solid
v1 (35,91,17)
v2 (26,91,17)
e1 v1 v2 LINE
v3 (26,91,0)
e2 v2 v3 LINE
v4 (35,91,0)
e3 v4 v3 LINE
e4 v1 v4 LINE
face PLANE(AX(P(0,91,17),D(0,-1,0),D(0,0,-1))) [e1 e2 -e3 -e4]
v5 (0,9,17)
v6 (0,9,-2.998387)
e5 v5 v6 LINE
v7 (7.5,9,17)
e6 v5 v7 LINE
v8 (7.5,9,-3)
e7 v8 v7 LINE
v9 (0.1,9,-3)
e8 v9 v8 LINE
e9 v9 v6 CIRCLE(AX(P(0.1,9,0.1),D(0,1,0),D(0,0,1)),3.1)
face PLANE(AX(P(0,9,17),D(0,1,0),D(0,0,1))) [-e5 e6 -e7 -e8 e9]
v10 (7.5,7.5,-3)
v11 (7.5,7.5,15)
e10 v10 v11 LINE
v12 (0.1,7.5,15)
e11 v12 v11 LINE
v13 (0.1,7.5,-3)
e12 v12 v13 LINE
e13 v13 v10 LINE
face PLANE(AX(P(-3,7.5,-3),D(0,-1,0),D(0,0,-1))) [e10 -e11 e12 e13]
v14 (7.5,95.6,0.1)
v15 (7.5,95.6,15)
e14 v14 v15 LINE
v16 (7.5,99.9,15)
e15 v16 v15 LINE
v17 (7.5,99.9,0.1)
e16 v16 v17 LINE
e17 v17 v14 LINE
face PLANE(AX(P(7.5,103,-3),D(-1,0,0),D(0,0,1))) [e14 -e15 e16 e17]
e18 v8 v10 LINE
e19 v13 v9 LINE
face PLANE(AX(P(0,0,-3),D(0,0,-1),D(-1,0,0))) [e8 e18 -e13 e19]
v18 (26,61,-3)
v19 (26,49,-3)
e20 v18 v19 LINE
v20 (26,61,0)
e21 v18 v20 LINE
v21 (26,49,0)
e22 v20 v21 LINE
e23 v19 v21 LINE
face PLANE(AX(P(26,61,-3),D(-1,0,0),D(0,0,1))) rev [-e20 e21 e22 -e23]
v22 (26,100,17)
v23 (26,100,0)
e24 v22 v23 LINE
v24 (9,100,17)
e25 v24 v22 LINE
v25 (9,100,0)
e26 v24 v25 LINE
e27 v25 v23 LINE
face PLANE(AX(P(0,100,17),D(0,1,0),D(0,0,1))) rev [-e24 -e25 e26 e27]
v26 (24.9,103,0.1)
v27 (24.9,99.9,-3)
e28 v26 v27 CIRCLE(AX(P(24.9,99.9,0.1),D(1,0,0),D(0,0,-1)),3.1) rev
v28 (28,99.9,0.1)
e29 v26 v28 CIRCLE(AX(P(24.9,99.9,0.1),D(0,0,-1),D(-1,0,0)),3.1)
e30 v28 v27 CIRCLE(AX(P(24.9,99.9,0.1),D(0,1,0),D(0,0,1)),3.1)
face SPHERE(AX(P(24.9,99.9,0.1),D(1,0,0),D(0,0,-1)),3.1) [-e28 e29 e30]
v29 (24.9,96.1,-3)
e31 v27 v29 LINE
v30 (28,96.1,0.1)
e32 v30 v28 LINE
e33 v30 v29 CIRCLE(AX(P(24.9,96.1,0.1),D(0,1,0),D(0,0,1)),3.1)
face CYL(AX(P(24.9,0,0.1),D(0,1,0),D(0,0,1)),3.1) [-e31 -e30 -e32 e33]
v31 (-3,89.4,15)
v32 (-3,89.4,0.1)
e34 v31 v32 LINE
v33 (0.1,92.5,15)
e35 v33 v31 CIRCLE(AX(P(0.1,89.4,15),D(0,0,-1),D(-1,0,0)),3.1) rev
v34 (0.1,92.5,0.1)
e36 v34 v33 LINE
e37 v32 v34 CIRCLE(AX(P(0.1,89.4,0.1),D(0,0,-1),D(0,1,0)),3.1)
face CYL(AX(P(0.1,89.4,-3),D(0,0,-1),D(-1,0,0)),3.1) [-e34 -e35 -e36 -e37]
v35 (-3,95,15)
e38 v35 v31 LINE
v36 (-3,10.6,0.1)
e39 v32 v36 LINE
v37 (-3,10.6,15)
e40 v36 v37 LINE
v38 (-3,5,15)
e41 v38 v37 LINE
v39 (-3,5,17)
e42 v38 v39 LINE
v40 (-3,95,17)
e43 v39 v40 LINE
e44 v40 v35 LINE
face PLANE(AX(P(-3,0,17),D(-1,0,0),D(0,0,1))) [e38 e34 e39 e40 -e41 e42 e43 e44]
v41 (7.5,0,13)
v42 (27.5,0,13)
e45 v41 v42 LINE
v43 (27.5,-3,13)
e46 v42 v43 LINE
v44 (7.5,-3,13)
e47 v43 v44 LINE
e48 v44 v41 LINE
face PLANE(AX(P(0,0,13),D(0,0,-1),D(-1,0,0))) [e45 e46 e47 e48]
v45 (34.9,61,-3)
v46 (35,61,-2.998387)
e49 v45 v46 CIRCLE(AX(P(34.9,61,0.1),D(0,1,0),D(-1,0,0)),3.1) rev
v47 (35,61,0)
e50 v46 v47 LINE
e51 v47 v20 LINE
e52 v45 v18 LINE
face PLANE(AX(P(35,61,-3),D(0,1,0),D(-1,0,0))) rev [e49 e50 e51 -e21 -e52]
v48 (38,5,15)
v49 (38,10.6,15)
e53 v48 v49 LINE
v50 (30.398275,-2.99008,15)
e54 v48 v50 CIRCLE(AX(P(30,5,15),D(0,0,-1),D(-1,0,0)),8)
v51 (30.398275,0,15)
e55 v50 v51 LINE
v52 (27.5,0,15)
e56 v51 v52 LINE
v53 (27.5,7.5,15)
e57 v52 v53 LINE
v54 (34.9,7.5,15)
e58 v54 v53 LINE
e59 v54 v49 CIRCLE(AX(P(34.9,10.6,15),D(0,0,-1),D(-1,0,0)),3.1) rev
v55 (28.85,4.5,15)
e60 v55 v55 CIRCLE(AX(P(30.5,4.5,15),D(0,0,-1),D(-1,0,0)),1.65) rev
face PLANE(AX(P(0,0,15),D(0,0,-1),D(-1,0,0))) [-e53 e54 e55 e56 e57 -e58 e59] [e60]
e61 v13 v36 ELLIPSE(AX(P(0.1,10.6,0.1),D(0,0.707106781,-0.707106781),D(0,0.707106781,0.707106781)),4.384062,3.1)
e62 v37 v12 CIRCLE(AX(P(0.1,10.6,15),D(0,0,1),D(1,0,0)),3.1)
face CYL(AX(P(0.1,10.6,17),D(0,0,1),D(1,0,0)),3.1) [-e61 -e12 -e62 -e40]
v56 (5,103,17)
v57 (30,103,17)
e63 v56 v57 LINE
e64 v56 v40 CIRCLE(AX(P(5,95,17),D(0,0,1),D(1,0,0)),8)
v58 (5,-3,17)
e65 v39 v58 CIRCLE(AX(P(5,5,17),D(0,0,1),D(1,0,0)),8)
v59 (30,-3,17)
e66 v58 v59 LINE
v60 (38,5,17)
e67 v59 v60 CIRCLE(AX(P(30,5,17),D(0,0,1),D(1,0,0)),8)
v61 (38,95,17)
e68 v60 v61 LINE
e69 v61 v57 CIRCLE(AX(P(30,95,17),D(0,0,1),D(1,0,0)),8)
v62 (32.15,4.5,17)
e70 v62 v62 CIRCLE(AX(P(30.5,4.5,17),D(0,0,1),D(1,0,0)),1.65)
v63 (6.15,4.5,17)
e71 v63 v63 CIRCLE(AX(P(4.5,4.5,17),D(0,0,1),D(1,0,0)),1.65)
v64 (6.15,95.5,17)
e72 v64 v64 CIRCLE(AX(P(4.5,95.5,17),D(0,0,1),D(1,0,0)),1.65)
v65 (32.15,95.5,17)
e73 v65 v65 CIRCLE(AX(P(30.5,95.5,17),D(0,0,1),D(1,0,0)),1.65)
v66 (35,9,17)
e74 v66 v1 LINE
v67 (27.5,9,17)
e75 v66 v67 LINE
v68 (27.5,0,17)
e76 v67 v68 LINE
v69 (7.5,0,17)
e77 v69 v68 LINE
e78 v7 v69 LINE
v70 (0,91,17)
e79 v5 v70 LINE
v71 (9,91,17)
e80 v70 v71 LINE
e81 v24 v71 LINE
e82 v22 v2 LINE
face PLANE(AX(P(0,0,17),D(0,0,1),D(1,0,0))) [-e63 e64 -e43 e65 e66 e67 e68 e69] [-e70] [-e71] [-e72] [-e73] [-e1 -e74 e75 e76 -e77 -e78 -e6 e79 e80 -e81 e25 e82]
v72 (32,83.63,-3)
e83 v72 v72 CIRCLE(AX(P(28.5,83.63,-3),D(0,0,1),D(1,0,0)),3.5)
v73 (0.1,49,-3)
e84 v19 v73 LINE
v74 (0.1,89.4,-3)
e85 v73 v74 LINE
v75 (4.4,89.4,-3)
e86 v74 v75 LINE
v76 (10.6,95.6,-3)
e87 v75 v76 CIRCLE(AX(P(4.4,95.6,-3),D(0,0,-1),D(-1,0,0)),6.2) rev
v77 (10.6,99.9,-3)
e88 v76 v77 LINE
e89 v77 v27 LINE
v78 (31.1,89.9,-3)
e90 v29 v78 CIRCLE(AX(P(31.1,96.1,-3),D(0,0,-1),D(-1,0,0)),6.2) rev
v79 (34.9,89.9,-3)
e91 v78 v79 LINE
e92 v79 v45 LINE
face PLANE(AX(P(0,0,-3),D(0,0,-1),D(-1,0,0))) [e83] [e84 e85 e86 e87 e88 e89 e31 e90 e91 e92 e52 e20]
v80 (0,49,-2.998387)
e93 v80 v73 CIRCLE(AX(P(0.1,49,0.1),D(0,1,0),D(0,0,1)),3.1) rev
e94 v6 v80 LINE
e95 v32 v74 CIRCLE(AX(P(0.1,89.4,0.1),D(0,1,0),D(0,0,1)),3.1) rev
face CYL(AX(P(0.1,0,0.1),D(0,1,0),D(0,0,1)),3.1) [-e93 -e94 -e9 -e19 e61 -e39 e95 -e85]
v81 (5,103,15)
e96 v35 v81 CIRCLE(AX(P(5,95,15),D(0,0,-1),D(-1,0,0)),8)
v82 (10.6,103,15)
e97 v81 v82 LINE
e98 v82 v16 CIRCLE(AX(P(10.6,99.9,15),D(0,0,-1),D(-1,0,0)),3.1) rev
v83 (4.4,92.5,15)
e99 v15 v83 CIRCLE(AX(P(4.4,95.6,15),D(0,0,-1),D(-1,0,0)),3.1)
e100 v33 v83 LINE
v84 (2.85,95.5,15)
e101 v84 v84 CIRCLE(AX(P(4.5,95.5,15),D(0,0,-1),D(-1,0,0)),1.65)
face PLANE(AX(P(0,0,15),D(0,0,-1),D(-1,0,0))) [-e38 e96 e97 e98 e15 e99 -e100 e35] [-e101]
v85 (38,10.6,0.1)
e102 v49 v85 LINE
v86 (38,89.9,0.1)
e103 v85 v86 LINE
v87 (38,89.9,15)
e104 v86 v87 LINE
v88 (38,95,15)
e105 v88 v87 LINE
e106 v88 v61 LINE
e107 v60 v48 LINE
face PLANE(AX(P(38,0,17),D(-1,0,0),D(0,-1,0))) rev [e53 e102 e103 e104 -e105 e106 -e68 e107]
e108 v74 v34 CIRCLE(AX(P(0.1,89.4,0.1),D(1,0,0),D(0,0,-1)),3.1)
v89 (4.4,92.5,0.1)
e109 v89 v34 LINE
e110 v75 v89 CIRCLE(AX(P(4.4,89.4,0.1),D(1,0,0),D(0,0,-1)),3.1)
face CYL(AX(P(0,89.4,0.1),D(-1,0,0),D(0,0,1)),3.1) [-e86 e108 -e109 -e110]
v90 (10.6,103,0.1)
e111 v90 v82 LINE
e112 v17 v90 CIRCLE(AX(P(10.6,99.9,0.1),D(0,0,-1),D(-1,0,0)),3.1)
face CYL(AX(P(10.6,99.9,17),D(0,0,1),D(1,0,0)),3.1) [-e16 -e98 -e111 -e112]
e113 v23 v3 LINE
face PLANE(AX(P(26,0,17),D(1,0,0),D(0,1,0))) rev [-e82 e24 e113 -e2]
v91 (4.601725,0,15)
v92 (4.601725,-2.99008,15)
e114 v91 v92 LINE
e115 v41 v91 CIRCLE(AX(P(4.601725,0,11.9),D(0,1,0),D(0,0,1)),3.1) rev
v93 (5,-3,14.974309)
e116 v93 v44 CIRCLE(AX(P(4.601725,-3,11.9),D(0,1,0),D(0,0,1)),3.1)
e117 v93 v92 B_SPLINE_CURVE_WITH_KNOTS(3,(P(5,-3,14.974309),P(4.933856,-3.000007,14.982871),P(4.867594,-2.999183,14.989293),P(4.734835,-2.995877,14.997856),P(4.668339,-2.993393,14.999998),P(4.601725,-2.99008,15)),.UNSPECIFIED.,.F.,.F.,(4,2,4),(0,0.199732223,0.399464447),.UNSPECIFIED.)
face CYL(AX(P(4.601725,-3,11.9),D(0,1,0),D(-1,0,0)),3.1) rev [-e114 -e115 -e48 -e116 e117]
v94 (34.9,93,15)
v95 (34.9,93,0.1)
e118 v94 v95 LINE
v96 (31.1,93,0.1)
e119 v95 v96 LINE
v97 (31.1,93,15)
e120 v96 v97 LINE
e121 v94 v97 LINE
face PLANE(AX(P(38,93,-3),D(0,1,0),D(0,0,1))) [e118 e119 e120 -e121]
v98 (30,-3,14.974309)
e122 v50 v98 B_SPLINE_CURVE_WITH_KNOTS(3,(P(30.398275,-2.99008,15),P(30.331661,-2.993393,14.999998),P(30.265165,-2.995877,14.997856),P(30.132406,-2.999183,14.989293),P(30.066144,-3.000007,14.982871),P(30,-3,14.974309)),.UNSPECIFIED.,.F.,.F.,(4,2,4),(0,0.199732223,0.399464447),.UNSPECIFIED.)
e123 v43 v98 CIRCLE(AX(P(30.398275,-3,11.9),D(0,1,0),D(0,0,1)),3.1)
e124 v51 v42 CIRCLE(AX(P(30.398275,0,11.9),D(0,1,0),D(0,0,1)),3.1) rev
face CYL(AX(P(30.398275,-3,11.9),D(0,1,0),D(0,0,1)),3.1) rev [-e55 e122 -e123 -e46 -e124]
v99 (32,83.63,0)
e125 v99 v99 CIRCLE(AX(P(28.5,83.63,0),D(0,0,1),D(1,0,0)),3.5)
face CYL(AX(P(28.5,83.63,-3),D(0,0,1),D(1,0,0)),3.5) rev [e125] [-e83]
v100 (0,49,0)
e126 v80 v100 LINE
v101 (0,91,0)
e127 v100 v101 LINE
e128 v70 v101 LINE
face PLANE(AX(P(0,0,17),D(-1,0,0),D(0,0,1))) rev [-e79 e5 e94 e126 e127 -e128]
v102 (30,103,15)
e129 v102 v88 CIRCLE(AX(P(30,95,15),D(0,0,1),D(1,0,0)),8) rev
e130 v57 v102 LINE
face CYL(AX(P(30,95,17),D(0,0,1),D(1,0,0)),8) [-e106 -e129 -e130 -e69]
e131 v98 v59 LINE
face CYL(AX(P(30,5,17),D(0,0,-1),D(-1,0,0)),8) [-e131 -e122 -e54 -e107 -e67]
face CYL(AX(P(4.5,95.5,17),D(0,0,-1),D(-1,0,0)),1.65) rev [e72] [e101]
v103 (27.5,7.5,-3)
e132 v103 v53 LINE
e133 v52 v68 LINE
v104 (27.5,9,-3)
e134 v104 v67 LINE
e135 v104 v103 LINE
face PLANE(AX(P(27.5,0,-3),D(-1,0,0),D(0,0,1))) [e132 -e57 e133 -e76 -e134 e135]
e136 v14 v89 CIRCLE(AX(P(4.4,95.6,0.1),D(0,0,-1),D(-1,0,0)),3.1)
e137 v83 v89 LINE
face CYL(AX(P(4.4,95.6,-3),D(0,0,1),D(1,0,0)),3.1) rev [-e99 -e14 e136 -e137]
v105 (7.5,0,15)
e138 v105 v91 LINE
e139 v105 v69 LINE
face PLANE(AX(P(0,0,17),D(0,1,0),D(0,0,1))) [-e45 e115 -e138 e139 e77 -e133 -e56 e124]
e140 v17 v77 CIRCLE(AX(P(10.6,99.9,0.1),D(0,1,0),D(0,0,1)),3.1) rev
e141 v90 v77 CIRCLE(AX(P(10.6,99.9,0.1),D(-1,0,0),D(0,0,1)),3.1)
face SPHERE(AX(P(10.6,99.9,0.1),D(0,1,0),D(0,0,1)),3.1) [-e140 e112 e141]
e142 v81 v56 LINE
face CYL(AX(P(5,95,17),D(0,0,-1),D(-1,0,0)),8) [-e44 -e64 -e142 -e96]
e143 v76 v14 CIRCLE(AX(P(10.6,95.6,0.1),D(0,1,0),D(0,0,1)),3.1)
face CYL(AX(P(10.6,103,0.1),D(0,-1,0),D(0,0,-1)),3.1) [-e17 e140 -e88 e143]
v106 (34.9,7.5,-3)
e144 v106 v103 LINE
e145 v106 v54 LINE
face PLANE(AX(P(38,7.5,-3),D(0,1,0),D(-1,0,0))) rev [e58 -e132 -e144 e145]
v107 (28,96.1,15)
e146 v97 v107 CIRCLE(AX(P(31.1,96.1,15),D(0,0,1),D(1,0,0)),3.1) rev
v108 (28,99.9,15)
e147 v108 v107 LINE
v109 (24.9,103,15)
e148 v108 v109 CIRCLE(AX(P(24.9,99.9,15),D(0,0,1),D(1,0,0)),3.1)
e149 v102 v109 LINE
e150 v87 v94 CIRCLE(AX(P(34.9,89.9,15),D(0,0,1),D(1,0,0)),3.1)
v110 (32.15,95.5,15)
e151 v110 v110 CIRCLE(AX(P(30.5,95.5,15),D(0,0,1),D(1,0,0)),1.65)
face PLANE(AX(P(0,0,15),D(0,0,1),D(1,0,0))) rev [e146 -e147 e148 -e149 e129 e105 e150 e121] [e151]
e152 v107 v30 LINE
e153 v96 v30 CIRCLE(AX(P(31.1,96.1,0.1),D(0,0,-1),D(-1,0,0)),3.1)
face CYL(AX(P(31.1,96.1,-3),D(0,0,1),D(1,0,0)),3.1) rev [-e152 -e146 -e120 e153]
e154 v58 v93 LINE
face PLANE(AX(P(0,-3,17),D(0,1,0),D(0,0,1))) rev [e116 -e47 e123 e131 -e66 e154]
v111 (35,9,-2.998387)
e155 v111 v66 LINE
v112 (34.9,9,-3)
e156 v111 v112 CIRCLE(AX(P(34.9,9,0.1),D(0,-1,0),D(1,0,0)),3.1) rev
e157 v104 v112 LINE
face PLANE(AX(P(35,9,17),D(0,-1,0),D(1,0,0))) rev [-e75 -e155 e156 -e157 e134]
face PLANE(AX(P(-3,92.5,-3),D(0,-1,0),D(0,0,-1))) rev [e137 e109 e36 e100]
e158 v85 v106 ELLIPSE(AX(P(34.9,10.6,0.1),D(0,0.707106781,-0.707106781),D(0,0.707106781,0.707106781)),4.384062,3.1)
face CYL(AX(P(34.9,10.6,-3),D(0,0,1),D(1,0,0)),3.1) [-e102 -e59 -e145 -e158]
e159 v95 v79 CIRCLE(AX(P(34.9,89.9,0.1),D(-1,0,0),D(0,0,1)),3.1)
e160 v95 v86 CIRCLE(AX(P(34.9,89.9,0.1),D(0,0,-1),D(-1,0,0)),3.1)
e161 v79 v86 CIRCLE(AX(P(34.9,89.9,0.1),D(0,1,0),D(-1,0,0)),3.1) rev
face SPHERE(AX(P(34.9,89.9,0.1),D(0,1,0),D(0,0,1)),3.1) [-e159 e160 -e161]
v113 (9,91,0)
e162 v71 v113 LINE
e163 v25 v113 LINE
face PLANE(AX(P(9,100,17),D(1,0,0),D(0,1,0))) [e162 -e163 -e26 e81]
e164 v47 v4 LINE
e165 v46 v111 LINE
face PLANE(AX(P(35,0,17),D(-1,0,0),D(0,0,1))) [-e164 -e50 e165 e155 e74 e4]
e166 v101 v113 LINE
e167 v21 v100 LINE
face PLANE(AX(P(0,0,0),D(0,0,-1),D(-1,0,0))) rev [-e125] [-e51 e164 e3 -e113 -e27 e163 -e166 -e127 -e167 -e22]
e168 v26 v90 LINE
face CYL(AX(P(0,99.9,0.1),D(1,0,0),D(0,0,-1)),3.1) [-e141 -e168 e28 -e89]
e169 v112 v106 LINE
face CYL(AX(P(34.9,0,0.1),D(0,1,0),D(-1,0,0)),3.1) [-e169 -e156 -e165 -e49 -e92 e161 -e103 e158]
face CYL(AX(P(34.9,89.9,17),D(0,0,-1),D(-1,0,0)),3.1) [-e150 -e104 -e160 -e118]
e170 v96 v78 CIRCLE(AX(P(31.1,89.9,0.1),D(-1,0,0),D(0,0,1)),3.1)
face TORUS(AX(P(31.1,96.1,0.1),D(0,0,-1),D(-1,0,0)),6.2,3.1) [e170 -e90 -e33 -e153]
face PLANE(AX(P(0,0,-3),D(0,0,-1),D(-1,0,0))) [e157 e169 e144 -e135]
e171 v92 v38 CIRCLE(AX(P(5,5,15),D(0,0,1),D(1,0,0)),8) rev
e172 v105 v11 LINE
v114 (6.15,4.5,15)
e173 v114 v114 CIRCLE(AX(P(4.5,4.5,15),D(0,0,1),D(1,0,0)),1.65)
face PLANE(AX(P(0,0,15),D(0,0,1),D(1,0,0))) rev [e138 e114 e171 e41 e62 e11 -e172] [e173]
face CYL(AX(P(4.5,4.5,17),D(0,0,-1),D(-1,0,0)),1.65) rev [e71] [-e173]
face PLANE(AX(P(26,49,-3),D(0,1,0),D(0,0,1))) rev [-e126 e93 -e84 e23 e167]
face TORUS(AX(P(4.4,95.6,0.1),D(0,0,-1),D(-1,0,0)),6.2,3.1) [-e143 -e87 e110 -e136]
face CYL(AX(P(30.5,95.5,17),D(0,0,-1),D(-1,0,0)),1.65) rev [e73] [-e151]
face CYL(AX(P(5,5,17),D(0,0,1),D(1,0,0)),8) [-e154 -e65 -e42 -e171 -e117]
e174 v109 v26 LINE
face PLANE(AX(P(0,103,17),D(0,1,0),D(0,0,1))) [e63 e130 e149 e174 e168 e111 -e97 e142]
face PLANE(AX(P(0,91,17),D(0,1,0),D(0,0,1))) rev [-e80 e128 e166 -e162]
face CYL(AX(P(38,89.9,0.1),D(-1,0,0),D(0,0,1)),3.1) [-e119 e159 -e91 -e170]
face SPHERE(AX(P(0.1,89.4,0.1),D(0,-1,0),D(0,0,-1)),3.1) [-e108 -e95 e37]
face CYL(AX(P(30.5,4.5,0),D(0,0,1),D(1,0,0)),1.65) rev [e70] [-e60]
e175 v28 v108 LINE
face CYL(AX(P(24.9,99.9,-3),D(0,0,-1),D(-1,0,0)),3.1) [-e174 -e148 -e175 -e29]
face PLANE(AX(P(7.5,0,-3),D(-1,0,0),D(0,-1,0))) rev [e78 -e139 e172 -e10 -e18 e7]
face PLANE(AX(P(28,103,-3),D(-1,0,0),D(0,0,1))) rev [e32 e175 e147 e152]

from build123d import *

# Parameters (mm, degrees)
SKETCH_2_W          = 41
SKETCH_2_H          = 106
SKETCH_2_R          = 1.65
EXTRUDE_3_DEPTH     = 17
SKETCH_5_R          = 1.65
CUT_EXTRUDE_2_DEPTH = 112.094554322
SKETCH_6_W          = 41
SKETCH_6_H          = 106
EXTRUDE_4_DEPTH     = 3
CUT_EXTRUDE_START   = -2
SKETCH_7_W          = 10.5
SKETCH_7_H          = 10.5
SKETCH_7_W_2        = 10
SKETCH_7_H_2        = 10
CUT_EXTRUDE_3_DEPTH = 110.593010534
SKETCH_9_W          = 1.5
SKETCH_9_H          = 9
CUT_EXTRUDE_4_DEPTH = 112.593010534
SKETCH_10_R         = 3.5
CUT_EXTRUDE_7_DEPTH = 112.094554322
SKETCH_12_W         = 20
SKETCH_12_H         = 3
CUT_EXTRUDE_8_DEPTH = 16
CUT_EXTRUDE_9_DEPTH = 112.094554322
FILLET_1_R          = 3.1
FILLET_2_R          = 3.1
FILLET_3_R          = 3.1
FILLET_4_R          = 8


with BuildPart() as part:
    # 草图2 → 凸台-拉伸3 (new body)
    with BuildSketch(Plane.XY):
        with Locations((17.5, 50)):
            Rectangle(SKETCH_2_W, SKETCH_2_H)
        Polygon((9, 0), (9, 9), (0, 9), (0, 91), (9, 91), (9, 100), (26, 100), (26, 91), (35, 91), (35, 9), (26, 9), (26, 0), align=None, mode=Mode.SUBTRACT)
        with Locations((4.5, 4.5)):
            Circle(SKETCH_2_R, mode=Mode.SUBTRACT)
        with Locations((4.5, 95.5)):
            Circle(SKETCH_2_R, mode=Mode.SUBTRACT)
        with Locations((30.5, 95.5)):
            Circle(SKETCH_2_R, mode=Mode.SUBTRACT)
    extrude(amount=EXTRUDE_3_DEPTH)

    # 草图5 → 切除-拉伸2 (cut, through all)
    with BuildSketch(Plane.XY.offset(17)):
        with Locations((30.5, 4.5)):
            Circle(SKETCH_5_R)
    extrude(amount=-CUT_EXTRUDE_2_DEPTH, mode=Mode.SUBTRACT)

    # 草图6 → 凸台-拉伸4 (add)
    with BuildSketch(Plane(origin=(0, 0, 0), x_dir=(-1, 0, 0), z_dir=(0, 0, -1))):
        with Locations((-17.5, 50)):
            Rectangle(SKETCH_6_W, SKETCH_6_H)
    extrude(amount=EXTRUDE_4_DEPTH)

    # 草图7 → 切除-拉伸3 (cut, through all)
    with BuildSketch(Plane.XY.offset(17).offset(CUT_EXTRUDE_START)):
        with Locations((2.25, 97.75)):
            Rectangle(SKETCH_7_W, SKETCH_7_H)
        with Locations((33, 98)):
            Rectangle(SKETCH_7_W_2, SKETCH_7_H_2)
        with Locations((2.25, 2.25)):
            Rectangle(SKETCH_7_W, SKETCH_7_H)
        with Locations((32.75, 2.25)):
            Rectangle(SKETCH_7_W, SKETCH_7_H)
    extrude(amount=-CUT_EXTRUDE_3_DEPTH, mode=Mode.SUBTRACT)

    # 草图9 → 切除-拉伸4 (cut, through all)
    with BuildSketch(Plane.XY.offset(17)):
        with Locations((8.25, 4.5)):
            Rectangle(SKETCH_9_W, SKETCH_9_H)
        with Locations((26.75, 4.5)):
            Rectangle(SKETCH_9_W, SKETCH_9_H)
    extrude(amount=-CUT_EXTRUDE_4_DEPTH, mode=Mode.SUBTRACT)

    # 草图10 → 切除-拉伸7 (cut, through all)
    with BuildSketch(Plane.XY):
        with Locations((28.5, 83.63)):
            Circle(SKETCH_10_R)
    extrude(amount=-CUT_EXTRUDE_7_DEPTH, mode=Mode.SUBTRACT)

    # 草图12 → 切除-拉伸8 (cut)
    with BuildSketch(Plane(origin=(0, 0, -3), x_dir=(-1, 0, 0), z_dir=(0, 0, -1))):
        with Locations((-17.5, -1.5)):
            Rectangle(SKETCH_12_W, SKETCH_12_H)
    extrude(amount=-CUT_EXTRUDE_8_DEPTH, mode=Mode.SUBTRACT)

    # 草图13 → 切除-拉伸9 (cut, through all)
    with BuildSketch(Plane.XY):
        Polygon((0, 49), (0, 9), (9, 9), (9, 0), (26, 0), (26, 9), (35, 9), (35, 61), (26, 61), (26, 49), align=None)
    extrude(amount=-CUT_EXTRUDE_9_DEPTH, mode=Mode.SUBTRACT)

    # 圆角1
    # the kernel refuses this fillet: 3.1 mm, written as the material it takes off along each edge
    with BuildSketch(Plane(origin=(-3, 100.25, -3), x_dir=(0, 0, 1), z_dir=(0, -1, 0))) as fillet_1_piece_1:
        with BuildLine():
            CenterArc((FILLET_1_R, -FILLET_1_R), FILLET_1_R, 90, 90)
            Line((0, -FILLET_1_R), (0, 0))
            Line((0, 0), (FILLET_1_R, 0))
        make_face()
    extrude(amount=100.5, mode=Mode.SUBTRACT)
    with BuildSketch(Plane(origin=(38, -0.25, -3), x_dir=(0, 0, 1), z_dir=(0, 1, 0))) as fillet_1_piece_2:
        with BuildLine():
            CenterArc((FILLET_1_R, -FILLET_1_R), FILLET_1_R, 90, 90)
            Line((0, -FILLET_1_R), (0, 0))
            Line((0, 0), (FILLET_1_R, 0))
        make_face()
    extrude(amount=101, mode=Mode.SUBTRACT)

    # 圆角2
    # the kernel refuses this fillet: 3.1 mm, written as the material it adds along each edge
    with BuildSketch(Plane(origin=(7.5, -3, 15), x_dir=(-1, 0, 0), z_dir=(0, 1, 0))) as fillet_2_piece_1:
        with BuildLine():
            CenterArc((2.898275349, -3.1), FILLET_2_R, 90, 69.216440404)
            Line((0, -2), (0, 0))
            Line((0, 0), (2.898275349, 0))
        make_face()
    extrude(amount=3)
    with BuildSketch(Plane(origin=(27.5, -3, 15), x_dir=(0, 0, -1), z_dir=(0, 1, 0))) as fillet_2_piece_2:
        with BuildLine():
            CenterArc((3.1, -2.898275349), FILLET_2_R, 110.783559596, 69.216440404)
            Line((0, -2.898275349), (0, 0))
            Line((0, 0), (2, 0))
        make_face()
    extrude(amount=3)
    with BuildSketch(Plane(origin=(28, 93, 15), x_dir=(0, 1, 0), z_dir=(0, 0, -1))) as fillet_2_piece_3:
        with BuildLine():
            CenterArc((FILLET_2_R, FILLET_2_R), FILLET_2_R, 180, 90)
            Line((0, FILLET_2_R), (0, 0))
            Line((0, 0), (FILLET_2_R, 0))
        make_face()
    extrude(amount=18)
    with BuildSketch(Plane(origin=(7.5, 92.5, 22.75), x_dir=(-1, 0, 0), z_dir=(0, 0, -1))) as fillet_2_piece_4_section:
        with BuildLine():
            CenterArc((FILLET_2_R, FILLET_2_R), FILLET_2_R, 180, 90)
            Line((0, FILLET_2_R), (0, 0))
            Line((0, 0), (FILLET_2_R, 0))
        make_face()
    fillet_2_piece_4 = extrude(amount=25.75, mode=Mode.PRIVATE)
    fillet_2_piece_4 = split(fillet_2_piece_4, bisect_by=Plane(origin=(6.807559389, 93.192440611, 17), z_dir=(0, 0, -1)), keep=Keep.TOP, mode=Mode.PRIVATE)
    add(fillet_2_piece_4)

    # 圆角3
    # the kernel refuses this fillet: 3.1 mm, written as the material it takes off along each edge
    with BuildSketch(Plane(origin=(10.6, 99.9, 0.1), x_dir=(0, 0, -1), z_dir=(0, 1, 0))) as fillet_3_piece_1_section:
        Polygon((0, 0), (FILLET_3_R * 1.02, 0), (FILLET_3_R * 1.02, FILLET_3_R * 1.02), (0, FILLET_3_R * 1.02), align=None)
    fillet_3_piece_1 = extrude(amount=FILLET_3_R * 1.02, mode=Mode.PRIVATE)
    fillet_3_piece_1 = fillet_3_piece_1 - Plane(origin=(10.6, 99.9, 0.1), x_dir=(0.7071067811865475, 0, 0.7071067811865475), z_dir=(0, 1, 0)) * Sphere(FILLET_3_R, mode=Mode.PRIVATE)
    add(fillet_3_piece_1, mode=Mode.SUBTRACT)
    with BuildSketch(Plane(origin=(24.9, 99.9, 0.1), x_dir=(1, 0, 0), z_dir=(0, 1, 0))) as fillet_3_piece_2_section:
        Polygon((0, 0), (FILLET_3_R * 1.02, 0), (FILLET_3_R * 1.02, FILLET_3_R * 1.02), (0, FILLET_3_R * 1.02), align=None)
    fillet_3_piece_2 = extrude(amount=FILLET_3_R * 1.02, mode=Mode.PRIVATE)
    fillet_3_piece_2 = fillet_3_piece_2 - Plane(origin=(24.9, 99.9, 0.1), x_dir=(-0.7071067811865475, 0, 0.7071067811865475), z_dir=(0, 1, 0)) * Sphere(FILLET_3_R, mode=Mode.PRIVATE)
    add(fillet_3_piece_2, mode=Mode.SUBTRACT)
    with BuildSketch(Plane(origin=(7.5, 99.9, -3), x_dir=(1, 0, 0), z_dir=(0, -1, 0))) as fillet_3_piece_3:
        with BuildLine():
            CenterArc((FILLET_3_R, FILLET_3_R), FILLET_3_R, 180, 90)
            Line((0, FILLET_3_R), (0, 0))
            Line((0, 0), (FILLET_3_R, 0))
        make_face()
    extrude(amount=4.3, mode=Mode.SUBTRACT)
    with BuildSketch(Plane(origin=(4.4, 95.6, -3), x_dir=(1, 0, 0), z_dir=(0, 1, 0))) as fillet_3_piece_4:
        with BuildLine():
            CenterArc((3.1 + FILLET_3_R, -FILLET_3_R), FILLET_3_R, 90, 90)
            Line((3.1, -FILLET_3_R), (3.1, 0))
            Line((3.1, 0), (3.1 + FILLET_3_R, 0))
        make_face()
    revolve(axis=Axis((4.4, 95.6, -3), (0, 0, -1)), revolution_arc=90, mode=Mode.SUBTRACT)
    with BuildSketch(Plane(origin=(4.4, 92.5, -3), x_dir=(0, 0, 1), z_dir=(-1, 0, 0))) as fillet_3_piece_5:
        with BuildLine():
            CenterArc((FILLET_3_R, -FILLET_3_R), FILLET_3_R, 90, 90)
            Line((0, -FILLET_3_R), (0, 0))
            Line((0, 0), (FILLET_3_R, 0))
        make_face()
    extrude(amount=4.3, mode=Mode.SUBTRACT)
    with BuildSketch(Plane(origin=(0.1, 92.5, 0.1), x_dir=(0, 0, -1), z_dir=(1, 0, 0))) as fillet_3_piece_6:
        with BuildLine():
            CenterArc((3.1 - FILLET_3_R, -FILLET_3_R), FILLET_3_R, 0, 90)
            Line((3.1, -FILLET_3_R), (3.1, 0))
            Line((3.1, 0), (3.1 - FILLET_3_R, 0))
        make_face()
    revolve(axis=Axis((0.1, 92.5, 0.1), (0, 1, 0)), revolution_arc=90, mode=Mode.SUBTRACT)
    with BuildSketch(Plane(origin=(28, 99.9, -3), x_dir=(0, 0, 1), z_dir=(0, -1, 0))) as fillet_3_piece_7:
        with BuildLine():
            CenterArc((FILLET_3_R, FILLET_3_R), FILLET_3_R, 180, 90)
            Line((0, FILLET_3_R), (0, 0))
            Line((0, 0), (FILLET_3_R, 0))
        make_face()
    extrude(amount=3.8, mode=Mode.SUBTRACT)
    with BuildSketch(Plane(origin=(31.1, 96.1, -3), x_dir=(0, -1, 0), z_dir=(1, 0, 0))) as fillet_3_piece_8:
        with BuildLine():
            CenterArc((3.1 + FILLET_3_R, -FILLET_3_R), FILLET_3_R, 90, 90)
            Line((3.1, -FILLET_3_R), (3.1, 0))
            Line((3.1, 0), (3.1 + FILLET_3_R, 0))
        make_face()
    revolve(axis=Axis((31.1, 96.1, -3), (0, 0, -1)), revolution_arc=90, mode=Mode.SUBTRACT)
    with BuildSketch(Plane(origin=(31.1, 93, -3), x_dir=(0, -1, 0), z_dir=(1, 0, 0))) as fillet_3_piece_9:
        with BuildLine():
            CenterArc((FILLET_3_R, -FILLET_3_R), FILLET_3_R, 90, 90)
            Line((0, -FILLET_3_R), (0, 0))
            Line((0, 0), (FILLET_3_R, 0))
        make_face()
    extrude(amount=3.8, mode=Mode.SUBTRACT)
    with BuildSketch(Plane(origin=(34.9, 93, 0.1), x_dir=(0, 0, -1), z_dir=(-1, 0, 0))) as fillet_3_piece_10:
        with BuildLine():
            CenterArc((3.1 - FILLET_3_R, FILLET_3_R), FILLET_3_R, 270, 90)
            Line((3.1 - FILLET_3_R, 0), (3.1, 0))
            Line((3.1, 0), (3.1, FILLET_3_R))
        make_face()
    revolve(axis=Axis((34.9, 93, 0.1), (0, -1, 0)), revolution_arc=90, mode=Mode.SUBTRACT)
    with BuildSketch(Plane(origin=(28, 103, 15), x_dir=(-1, 0, 0), z_dir=(0, 0, -1)), Plane(origin=(-3, 92.5, 15), x_dir=(0, -1, 0), z_dir=(0, 0, -1))) as fillet_3_piece_11:
        with BuildLine():
            CenterArc((FILLET_3_R, -FILLET_3_R), FILLET_3_R, 90, 90)
            Line((0, -FILLET_3_R), (0, 0))
            Line((0, 0), (FILLET_3_R, 0))
        make_face()
    extrude(amount=14.9, mode=Mode.SUBTRACT)
    with BuildSketch(Plane(origin=(7.5, 103, 15), x_dir=(1, 0, 0), z_dir=(0, 0, -1)), Plane(origin=(38, 93, 15), x_dir=(0, -1, 0), z_dir=(0, 0, -1))) as fillet_3_piece_12:
        with BuildLine():
            CenterArc((FILLET_3_R, FILLET_3_R), FILLET_3_R, 180, 90)
            Line((0, FILLET_3_R), (0, 0))
            Line((0, 0), (FILLET_3_R, 0))
        make_face()
    extrude(amount=14.9, mode=Mode.SUBTRACT)
    with BuildSketch(Plane(origin=(24.9, 103, -3), x_dir=(0, 0, 1), z_dir=(-1, 0, 0))) as fillet_3_piece_13:
        with BuildLine():
            CenterArc((FILLET_3_R, -FILLET_3_R), FILLET_3_R, 90, 90)
            Line((0, -FILLET_3_R), (0, 0))
            Line((0, 0), (FILLET_3_R, 0))
        make_face()
    extrude(amount=14.3, mode=Mode.SUBTRACT)
    with BuildSketch(Plane(origin=(-3, 7.5, 15), x_dir=(0, 1, 0), z_dir=(0, 0, -1))) as fillet_3_piece_14:
        with BuildLine():
            CenterArc((FILLET_3_R, FILLET_3_R), FILLET_3_R, 180, 90)
            Line((0, FILLET_3_R), (0, 0))
            Line((0, 0), (FILLET_3_R, 0))
        make_face()
    extrude(amount=22.65, mode=Mode.SUBTRACT)
    with BuildSketch(Plane(origin=(38, 7.5, 15), x_dir=(0, 1, 0), z_dir=(0, 0, -1))) as fillet_3_piece_15:
        with BuildLine():
            CenterArc((FILLET_3_R, -FILLET_3_R), FILLET_3_R, 90, 90)
            Line((0, -FILLET_3_R), (0, 0))
            Line((0, 0), (FILLET_3_R, 0))
        make_face()
    extrude(amount=22.65, mode=Mode.SUBTRACT)

    # 圆角4
    fillet_4_edges = [part.edges().sort_by_distance(p)[0] for p in [
        (-3, 103, 16),
        (38, 103, 16),
        (38, -3, 16),
        (-3, -3, 16),
    ]]
    fillet(fillet_4_edges, radius=FILLET_4_R)


solid = part.part
